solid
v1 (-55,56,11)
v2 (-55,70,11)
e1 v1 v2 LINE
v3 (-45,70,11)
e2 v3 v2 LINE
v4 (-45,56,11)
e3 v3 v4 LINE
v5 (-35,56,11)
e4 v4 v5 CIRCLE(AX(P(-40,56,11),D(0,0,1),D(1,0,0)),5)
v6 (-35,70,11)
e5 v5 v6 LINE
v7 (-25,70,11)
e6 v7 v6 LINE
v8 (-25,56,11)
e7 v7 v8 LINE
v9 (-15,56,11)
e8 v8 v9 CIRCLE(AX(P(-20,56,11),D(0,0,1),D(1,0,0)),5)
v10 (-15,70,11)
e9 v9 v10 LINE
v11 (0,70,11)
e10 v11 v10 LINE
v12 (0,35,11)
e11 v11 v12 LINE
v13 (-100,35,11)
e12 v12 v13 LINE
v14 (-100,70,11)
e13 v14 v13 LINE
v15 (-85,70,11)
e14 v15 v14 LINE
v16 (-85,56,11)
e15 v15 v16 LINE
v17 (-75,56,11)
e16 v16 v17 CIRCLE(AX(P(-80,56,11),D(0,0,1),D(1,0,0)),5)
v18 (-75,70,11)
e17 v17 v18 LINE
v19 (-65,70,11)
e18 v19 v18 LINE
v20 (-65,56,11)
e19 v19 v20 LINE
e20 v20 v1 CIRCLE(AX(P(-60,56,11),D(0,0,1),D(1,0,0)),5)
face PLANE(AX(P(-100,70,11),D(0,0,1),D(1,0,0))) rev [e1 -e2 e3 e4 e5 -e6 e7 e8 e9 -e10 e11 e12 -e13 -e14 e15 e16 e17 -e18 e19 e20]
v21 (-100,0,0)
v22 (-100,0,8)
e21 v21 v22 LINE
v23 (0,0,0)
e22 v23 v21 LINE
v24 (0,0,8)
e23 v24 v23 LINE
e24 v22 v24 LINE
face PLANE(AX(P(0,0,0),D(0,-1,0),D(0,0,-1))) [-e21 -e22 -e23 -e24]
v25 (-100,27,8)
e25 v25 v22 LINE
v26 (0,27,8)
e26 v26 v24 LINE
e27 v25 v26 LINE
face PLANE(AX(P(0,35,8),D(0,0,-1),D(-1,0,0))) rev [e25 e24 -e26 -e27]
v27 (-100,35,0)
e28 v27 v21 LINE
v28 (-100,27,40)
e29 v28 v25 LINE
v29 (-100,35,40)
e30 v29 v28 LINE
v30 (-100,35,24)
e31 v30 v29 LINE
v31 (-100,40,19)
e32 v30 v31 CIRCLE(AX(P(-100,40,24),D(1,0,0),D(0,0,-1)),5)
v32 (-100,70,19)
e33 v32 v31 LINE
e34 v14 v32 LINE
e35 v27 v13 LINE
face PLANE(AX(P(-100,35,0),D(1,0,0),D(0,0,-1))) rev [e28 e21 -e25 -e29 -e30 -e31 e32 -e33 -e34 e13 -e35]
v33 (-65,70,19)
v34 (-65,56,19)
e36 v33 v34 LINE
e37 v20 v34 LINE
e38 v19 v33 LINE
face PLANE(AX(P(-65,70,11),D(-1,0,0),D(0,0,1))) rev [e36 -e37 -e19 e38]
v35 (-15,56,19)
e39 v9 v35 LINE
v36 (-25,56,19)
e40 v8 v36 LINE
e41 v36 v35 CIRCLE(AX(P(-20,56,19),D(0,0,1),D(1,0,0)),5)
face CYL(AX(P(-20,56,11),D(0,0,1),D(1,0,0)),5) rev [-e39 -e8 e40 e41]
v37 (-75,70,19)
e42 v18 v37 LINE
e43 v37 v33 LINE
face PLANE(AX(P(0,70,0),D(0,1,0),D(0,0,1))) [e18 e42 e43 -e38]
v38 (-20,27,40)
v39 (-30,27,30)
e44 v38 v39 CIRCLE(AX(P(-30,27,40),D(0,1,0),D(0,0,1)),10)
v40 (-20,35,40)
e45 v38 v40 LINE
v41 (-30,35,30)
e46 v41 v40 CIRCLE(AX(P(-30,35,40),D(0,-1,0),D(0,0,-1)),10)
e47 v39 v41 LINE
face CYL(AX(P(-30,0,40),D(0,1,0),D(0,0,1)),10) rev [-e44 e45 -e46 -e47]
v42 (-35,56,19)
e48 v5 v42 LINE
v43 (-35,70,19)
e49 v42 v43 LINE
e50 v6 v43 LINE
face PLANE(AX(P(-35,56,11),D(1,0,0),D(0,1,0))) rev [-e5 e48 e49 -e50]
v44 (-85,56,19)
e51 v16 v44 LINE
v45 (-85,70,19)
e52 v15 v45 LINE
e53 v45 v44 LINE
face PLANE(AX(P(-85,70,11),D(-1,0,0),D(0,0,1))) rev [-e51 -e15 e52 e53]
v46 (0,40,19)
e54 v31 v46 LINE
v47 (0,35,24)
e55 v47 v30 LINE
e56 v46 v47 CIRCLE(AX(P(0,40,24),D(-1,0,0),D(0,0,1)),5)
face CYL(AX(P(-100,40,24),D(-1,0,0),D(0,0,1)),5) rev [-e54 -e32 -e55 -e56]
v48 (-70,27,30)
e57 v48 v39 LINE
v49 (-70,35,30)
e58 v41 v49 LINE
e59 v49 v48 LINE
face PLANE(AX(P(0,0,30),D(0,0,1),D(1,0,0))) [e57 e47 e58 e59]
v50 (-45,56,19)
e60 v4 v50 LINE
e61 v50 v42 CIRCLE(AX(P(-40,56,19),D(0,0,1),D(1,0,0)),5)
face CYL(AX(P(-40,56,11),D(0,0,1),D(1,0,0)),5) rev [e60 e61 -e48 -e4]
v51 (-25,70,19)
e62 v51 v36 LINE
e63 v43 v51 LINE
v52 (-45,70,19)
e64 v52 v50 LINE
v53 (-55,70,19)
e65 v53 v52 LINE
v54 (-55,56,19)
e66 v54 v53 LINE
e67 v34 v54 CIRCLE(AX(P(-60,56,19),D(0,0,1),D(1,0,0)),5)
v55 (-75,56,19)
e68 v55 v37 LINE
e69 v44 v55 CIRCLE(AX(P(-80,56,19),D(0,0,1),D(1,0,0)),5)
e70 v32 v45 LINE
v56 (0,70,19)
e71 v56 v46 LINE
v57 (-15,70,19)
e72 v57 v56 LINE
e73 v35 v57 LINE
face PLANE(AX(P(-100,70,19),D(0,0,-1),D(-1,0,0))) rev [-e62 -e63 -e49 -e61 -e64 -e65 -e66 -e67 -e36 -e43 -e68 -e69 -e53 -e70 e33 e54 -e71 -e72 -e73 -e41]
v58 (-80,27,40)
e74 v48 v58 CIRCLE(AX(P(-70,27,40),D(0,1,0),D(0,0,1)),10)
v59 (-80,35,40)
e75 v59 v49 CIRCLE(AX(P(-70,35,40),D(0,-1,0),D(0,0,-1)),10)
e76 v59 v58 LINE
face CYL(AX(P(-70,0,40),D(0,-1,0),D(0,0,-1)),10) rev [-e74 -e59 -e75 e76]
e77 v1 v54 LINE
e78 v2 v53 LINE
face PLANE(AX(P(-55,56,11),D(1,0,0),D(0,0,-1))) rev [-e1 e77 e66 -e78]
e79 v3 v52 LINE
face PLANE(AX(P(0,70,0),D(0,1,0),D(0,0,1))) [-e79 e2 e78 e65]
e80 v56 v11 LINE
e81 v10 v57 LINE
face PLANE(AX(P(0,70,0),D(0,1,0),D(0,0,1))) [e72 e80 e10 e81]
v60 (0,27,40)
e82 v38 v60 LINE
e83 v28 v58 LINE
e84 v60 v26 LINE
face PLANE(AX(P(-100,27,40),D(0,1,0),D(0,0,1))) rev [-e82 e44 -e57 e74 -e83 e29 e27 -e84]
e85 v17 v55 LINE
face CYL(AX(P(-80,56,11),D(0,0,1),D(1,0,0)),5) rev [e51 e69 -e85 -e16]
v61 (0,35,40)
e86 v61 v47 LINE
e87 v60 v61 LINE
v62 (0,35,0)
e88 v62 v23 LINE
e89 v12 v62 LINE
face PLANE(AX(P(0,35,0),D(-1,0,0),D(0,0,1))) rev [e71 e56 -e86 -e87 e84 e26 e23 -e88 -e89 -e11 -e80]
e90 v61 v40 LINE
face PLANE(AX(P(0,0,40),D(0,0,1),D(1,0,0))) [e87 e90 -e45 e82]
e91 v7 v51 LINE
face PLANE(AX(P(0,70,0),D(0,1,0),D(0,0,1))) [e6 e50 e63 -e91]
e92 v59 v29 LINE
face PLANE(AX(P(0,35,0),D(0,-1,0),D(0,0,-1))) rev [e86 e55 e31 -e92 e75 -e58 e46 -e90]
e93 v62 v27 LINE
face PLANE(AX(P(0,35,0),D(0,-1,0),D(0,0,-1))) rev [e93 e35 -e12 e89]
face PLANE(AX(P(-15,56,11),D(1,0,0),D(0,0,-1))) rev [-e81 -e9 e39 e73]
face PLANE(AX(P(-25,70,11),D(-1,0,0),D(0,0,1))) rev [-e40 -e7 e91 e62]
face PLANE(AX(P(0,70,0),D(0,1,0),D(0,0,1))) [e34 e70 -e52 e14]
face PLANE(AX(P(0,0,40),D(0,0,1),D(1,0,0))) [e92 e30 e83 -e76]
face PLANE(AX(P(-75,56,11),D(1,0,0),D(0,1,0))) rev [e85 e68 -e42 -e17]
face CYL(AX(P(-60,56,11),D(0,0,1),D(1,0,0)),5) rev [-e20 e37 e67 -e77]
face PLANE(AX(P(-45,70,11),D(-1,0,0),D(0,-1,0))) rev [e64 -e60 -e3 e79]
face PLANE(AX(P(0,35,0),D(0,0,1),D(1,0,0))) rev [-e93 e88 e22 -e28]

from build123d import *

# Parameters (mm, degrees)
SKETCH1_W           = 100
SKETCH1_H           = 8
BOSS_EXTRUDE1_DEPTH = 35
SKETCH2_W           = 100
SKETCH2_H           = 8
BOSS_EXTRUDE2_DEPTH = 40
SKETCH6_W           = 60
SKETCH6_H           = 8
CUT_EXTRUDE2_DEPTH  = 10
FILLET1_R           = 10
SKETCH8_W           = 100
SKETCH8_H           = 8
BOSS_EXTRUDE3_DEPTH = 35
CUT_EXTRUDE3_DEPTH  = 8
FILLET2_R           = 5


with BuildPart() as part:
    # Sketch1 → Boss-Extrude1 (new body)
    with BuildSketch(Plane(origin=(0, 0, 0), x_dir=(1, 0, 0), z_dir=(0, 1, 0))):
        with Locations((-50, -4)):
            Rectangle(SKETCH1_W, SKETCH1_H)
    extrude(amount=BOSS_EXTRUDE1_DEPTH)

    # Sketch2 → Boss-Extrude2 (add)
    with BuildSketch(Plane.XY):
        with Locations((-50, 31)):
            Rectangle(SKETCH2_W, SKETCH2_H)
    extrude(amount=BOSS_EXTRUDE2_DEPTH)

    # Sketch6 → Cut-Extrude2 (cut)
    with BuildSketch(Plane.XY.offset(40)):
        with Locations((-50, 31)):
            Rectangle(SKETCH6_W, SKETCH6_H)
    extrude(amount=-CUT_EXTRUDE2_DEPTH, mode=Mode.SUBTRACT)

    # Fillet1
    fillet1_edges = [part.edges().sort_by_distance(p)[0] for p in [
        (-20, 31, 30),
        (-80, 31, 30),
    ]]
    fillet(fillet1_edges, radius=FILLET1_R - 0.0001)  # a hair under: the kernel refuses the full size

    # Sketch8 → Boss-Extrude3 (add)
    with BuildSketch(Plane(origin=(0, 35, 0), x_dir=(1, 0, 0), z_dir=(0, 1, 0))):
        with Locations((-50, -15)):
            Rectangle(SKETCH8_W, SKETCH8_H)
    extrude(amount=BOSS_EXTRUDE3_DEPTH)

    # Sketch9 → Cut-Extrude3 (cut)
    with BuildSketch(Plane.XY.offset(19)):
        with BuildLine():
            Line((-85, 70), (-85, 56))
            ThreePointArc((-85, 56), (-80, 51), (-75, 56))
            Line((-75, 56), (-75, 70))
            Line((-75, 70), (-85, 70))
        make_face()
        with BuildLine():
            Line((-65, 70), (-65, 56))
            ThreePointArc((-65, 56), (-60, 51), (-55, 56))
            Line((-55, 56), (-55, 70))
            Line((-55, 70), (-65, 70))
        make_face()
        with BuildLine():
            Line((-45, 70), (-45, 56))
            ThreePointArc((-45, 56), (-40, 51), (-35, 56))
            Line((-35, 56), (-35, 70))
            Line((-35, 70), (-45, 70))
        make_face()
        with BuildLine():
            Line((-25, 70), (-25, 56))
            ThreePointArc((-25, 56), (-20, 51), (-15, 56))
            Line((-15, 56), (-15, 70))
            Line((-15, 70), (-25, 70))
        make_face()
    extrude(amount=-CUT_EXTRUDE3_DEPTH, mode=Mode.SUBTRACT)

    # Fillet2
    fillet2_edges = [part.edges().sort_by_distance(p)[0] for p in [
        (-50, 35, 19),
    ]]
    fillet(fillet2_edges, radius=FILLET2_R)


solid = part.part
